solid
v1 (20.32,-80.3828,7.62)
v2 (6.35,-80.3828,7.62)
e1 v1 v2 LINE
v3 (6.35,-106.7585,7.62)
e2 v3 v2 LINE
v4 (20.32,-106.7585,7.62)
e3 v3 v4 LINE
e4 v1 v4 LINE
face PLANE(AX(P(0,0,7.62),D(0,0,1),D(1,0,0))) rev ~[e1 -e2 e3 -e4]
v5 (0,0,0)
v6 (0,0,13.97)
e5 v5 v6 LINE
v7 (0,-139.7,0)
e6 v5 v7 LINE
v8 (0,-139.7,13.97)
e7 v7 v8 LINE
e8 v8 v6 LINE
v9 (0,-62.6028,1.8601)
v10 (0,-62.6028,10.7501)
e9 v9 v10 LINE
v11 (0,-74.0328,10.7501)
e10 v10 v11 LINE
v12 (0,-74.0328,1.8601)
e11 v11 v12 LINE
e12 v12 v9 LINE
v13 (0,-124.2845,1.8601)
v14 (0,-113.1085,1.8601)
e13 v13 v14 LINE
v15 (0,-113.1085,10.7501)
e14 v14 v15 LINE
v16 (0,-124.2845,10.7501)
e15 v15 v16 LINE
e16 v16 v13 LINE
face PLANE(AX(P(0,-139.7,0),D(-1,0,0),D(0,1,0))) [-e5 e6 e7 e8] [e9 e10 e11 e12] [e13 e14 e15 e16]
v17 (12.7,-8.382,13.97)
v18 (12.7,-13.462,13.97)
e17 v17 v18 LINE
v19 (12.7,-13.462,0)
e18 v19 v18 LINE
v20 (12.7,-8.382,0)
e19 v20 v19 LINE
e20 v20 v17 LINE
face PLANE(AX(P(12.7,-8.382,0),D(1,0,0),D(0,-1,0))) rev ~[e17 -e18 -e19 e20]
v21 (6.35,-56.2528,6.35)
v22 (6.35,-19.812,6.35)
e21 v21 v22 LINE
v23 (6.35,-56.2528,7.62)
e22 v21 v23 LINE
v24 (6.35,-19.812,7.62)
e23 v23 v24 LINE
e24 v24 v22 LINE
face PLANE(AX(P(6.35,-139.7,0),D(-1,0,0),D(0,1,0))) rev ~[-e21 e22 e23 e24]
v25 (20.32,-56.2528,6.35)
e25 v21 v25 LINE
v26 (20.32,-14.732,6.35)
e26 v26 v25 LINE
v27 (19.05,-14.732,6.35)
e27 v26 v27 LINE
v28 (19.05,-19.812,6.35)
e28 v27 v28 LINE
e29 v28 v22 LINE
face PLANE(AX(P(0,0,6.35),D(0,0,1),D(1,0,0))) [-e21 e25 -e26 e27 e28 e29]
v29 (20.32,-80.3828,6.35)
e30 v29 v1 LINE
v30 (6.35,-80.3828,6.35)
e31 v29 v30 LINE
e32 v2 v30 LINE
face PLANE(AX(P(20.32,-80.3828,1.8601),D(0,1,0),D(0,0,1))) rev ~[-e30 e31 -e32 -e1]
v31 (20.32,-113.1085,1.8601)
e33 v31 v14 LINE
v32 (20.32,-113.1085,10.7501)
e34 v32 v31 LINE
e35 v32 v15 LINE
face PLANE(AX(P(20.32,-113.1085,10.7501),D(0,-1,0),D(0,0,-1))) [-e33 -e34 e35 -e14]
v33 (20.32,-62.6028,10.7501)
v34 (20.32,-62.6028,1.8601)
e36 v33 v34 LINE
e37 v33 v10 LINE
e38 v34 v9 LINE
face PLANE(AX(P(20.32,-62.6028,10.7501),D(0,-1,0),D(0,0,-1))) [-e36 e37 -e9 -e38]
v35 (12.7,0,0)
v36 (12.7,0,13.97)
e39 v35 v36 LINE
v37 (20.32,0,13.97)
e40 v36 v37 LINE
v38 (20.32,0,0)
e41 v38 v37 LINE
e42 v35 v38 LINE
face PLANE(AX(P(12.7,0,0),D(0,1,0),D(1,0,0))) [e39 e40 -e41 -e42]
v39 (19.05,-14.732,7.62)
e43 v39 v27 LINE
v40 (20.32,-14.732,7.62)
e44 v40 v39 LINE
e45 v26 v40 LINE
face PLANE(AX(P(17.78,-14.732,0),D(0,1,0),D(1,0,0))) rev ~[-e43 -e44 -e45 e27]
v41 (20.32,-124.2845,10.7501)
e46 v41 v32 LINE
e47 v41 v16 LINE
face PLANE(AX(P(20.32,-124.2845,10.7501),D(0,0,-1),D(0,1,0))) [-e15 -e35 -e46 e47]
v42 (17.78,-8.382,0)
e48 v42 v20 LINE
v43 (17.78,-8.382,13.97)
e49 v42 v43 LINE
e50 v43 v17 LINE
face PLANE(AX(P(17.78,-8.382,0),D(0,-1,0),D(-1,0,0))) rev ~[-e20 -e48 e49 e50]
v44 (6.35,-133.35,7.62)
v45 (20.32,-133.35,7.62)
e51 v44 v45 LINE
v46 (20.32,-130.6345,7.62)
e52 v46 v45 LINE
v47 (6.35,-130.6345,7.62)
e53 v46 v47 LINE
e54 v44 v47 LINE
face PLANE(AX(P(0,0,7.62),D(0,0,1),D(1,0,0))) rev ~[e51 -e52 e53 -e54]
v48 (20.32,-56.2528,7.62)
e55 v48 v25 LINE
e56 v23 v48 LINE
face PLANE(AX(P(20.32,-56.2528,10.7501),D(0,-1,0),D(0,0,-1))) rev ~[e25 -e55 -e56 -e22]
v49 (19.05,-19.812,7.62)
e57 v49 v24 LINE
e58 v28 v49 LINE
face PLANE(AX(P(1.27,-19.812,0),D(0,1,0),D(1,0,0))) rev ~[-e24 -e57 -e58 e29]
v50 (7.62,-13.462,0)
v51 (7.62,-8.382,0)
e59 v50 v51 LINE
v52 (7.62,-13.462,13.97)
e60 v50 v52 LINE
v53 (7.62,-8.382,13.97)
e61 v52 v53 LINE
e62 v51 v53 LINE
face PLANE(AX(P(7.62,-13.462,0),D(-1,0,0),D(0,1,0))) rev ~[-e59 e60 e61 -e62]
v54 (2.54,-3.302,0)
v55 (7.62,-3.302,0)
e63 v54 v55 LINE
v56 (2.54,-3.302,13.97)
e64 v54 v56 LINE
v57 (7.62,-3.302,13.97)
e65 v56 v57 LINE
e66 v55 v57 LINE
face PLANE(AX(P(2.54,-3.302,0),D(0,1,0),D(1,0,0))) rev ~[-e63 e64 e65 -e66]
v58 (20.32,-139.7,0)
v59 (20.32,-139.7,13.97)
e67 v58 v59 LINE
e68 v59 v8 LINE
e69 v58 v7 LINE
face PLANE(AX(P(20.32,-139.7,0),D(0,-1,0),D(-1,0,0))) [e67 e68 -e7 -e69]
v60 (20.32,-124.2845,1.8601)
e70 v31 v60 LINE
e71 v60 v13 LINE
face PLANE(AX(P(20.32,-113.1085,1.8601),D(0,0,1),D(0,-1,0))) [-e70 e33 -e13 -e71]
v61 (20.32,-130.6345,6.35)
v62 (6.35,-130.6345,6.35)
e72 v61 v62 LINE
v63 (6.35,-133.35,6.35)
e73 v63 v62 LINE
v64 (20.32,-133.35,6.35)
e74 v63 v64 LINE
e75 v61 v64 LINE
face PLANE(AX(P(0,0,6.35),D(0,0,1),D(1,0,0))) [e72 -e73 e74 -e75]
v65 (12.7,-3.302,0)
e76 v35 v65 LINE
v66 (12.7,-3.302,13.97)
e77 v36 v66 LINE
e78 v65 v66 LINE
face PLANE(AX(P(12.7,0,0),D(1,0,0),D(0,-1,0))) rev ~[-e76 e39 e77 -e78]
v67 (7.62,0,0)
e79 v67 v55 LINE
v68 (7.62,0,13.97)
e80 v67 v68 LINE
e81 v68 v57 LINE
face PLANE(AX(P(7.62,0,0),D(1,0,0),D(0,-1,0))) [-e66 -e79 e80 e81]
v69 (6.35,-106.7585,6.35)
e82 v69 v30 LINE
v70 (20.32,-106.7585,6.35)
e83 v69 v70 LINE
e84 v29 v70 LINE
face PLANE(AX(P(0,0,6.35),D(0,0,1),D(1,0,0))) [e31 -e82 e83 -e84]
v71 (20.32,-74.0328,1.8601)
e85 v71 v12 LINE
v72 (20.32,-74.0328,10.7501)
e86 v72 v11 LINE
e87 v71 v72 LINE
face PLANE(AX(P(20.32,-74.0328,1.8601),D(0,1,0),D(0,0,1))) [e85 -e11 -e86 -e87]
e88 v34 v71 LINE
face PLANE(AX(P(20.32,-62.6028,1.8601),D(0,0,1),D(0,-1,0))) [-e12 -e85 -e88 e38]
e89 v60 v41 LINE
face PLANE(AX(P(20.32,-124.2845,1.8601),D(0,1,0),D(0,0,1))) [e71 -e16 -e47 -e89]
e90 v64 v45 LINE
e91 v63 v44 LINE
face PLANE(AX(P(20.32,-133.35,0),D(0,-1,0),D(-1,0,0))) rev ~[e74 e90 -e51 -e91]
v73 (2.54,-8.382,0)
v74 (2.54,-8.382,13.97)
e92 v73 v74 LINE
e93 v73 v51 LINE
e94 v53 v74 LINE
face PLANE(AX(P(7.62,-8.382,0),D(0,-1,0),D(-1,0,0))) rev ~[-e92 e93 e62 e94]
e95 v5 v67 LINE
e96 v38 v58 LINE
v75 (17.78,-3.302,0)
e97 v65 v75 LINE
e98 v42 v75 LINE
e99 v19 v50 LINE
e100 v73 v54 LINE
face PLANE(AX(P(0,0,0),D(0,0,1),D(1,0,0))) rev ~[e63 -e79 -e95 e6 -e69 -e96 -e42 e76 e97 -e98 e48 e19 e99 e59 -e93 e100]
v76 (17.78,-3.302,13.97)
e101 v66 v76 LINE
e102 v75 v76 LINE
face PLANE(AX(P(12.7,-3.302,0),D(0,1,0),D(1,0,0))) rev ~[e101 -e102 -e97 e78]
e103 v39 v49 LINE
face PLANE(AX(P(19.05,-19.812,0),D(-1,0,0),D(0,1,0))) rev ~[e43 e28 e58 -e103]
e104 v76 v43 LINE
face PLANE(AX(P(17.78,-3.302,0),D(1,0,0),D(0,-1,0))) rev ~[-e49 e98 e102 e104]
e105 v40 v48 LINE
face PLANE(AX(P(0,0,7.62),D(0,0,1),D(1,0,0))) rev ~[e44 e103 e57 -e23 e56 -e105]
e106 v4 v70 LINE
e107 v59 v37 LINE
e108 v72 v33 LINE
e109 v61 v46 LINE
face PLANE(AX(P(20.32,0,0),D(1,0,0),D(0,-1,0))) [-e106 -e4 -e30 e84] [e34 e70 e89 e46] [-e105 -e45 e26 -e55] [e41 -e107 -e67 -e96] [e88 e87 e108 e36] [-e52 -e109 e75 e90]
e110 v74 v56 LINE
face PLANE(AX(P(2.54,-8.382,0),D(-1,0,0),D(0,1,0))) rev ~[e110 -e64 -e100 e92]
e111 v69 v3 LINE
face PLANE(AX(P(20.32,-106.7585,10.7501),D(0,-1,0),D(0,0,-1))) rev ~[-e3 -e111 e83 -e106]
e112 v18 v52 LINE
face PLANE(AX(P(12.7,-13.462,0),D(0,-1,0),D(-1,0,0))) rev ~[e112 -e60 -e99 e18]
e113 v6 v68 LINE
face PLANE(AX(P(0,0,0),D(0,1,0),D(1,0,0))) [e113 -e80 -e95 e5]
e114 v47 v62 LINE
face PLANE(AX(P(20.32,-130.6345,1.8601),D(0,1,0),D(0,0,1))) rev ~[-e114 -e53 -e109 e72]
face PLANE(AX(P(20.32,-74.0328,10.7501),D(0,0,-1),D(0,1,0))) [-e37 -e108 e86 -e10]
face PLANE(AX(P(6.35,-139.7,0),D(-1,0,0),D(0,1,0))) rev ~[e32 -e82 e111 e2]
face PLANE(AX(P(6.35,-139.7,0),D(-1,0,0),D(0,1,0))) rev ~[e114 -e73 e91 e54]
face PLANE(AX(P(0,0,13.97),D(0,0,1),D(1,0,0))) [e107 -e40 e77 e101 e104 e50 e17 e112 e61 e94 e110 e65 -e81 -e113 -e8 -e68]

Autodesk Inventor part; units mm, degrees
ref_plane "YZ Plane" through (0, 0, 0) normal (1, 0, 0) x (0, 1, 0)
ref_plane "XZ Plane" through (0, 0, 0) normal (0, 1, 0) x (-1, 0, 0)
ref_plane "XY Plane" through (0, 0, 0) normal (0, 0, 1) x (1, 0, 0)
sketch "Sketch1" plane through (0, 0, 0) normal (0, 0, 1) x (1, 0, 0)
  line L0 (0, 0) -> (20.32, 0)
  line L1 (20.32, 0) -> (20.32, -139.7)
  line L2 (20.32, -139.7) -> (0, -139.7)
  line L3 (0, -139.7) -> (0, 0)
  line L4 (0, 0) -> (7.62, 0)
  line L5 (20.32, 0) -> (12.7, 0)
  line L6 (7.62, 0) -> (7.62, -3.302)
  line L7 (12.7, 0) -> (12.7, -3.302)
  line L8 (12.7, -3.302) -> (17.78, -3.302)
  line L9 (17.78, -3.302) -> (17.78, -8.382)
  line L10 (17.78, -8.382) -> (12.7, -8.382)
  line L11 (12.7, -8.382) -> (12.7, -13.462)
  line L12 (12.7, -13.462) -> (7.62, -13.462)
  line L13 (7.62, -13.462) -> (7.62, -8.382)
  line L14 (7.62, -8.382) -> (2.54, -8.382)
  line L15 (2.54, -8.382) -> (2.54, -3.302)
  line L16 (2.54, -3.302) -> (7.62, -3.302)
  line L17 (7.62, -3.302) -> (7.62, 0)
  dimension "d0" = 20.32
  dimension "d1" = 139.7
  dimension "d2" = 7.62
  dimension "d3" = 7.62
  dimension "d4" = 3.302
  dimension "d5" = 5.08
  dimension "d6" = 5.08
  dimension "d7" = 5.08
  dimension "d8" = 5.08
  dimension "d9" = 5.08
  dimension "d10" = 5.08
  dimension "d11" = 5.08
  dimension "d12" = 5.08
  dimension "d13" = 5.08
extrude "Extrusion1" add sketch "Sketch1" along normal blind 13.97 contours L0 L6 L16 L15 L14 L13 L12 L11 L10 L9 L8 L7 L1 L2 L3
sketch "Sketch2" plane through (20.32, -139.7, 0) normal (1, 0, 0) x (0, 0, -1)
  line L0 (-10.7501, 15.4155) -> (-10.7501, 26.5915)
  line L1 (-10.7501, 26.5915) -> (-1.8601, 26.5915)
  line L2 (-1.8601, 26.5915) -> (-1.8601, 15.4155)
  line L3 (-1.8601, 15.4155) -> (-10.7501, 15.4155)
  line L4 (-10.7501, 65.6672) -> (-10.7501, 77.0972)
  line L5 (-10.7501, 77.0972) -> (-1.8601, 77.0972)
  line L6 (-1.8601, 77.0972) -> (-1.8601, 65.6672)
  line L7 (-1.8601, 65.6672) -> (-10.7501, 65.6672)
  point P0 (0, 139.7)
  dimension "d16" = 11.176
  dimension "d17" = 8.89
  dimension "d18" = 11.43
  dimension "d19" = 8.89
extrude "Extrusion2" cut sketch "Sketch2" against normal blind 533.4
shell "Shell1" thickness 6.35 removed faces 1 at (20.32, -20.8676, 8.24)
sketch "Sketch3" plane through (0, 0, 13.97) normal (0, 0, 1) x (1, 0, 0)
  point P0 (0, 0)
properties part number "ripnewvertical2"
